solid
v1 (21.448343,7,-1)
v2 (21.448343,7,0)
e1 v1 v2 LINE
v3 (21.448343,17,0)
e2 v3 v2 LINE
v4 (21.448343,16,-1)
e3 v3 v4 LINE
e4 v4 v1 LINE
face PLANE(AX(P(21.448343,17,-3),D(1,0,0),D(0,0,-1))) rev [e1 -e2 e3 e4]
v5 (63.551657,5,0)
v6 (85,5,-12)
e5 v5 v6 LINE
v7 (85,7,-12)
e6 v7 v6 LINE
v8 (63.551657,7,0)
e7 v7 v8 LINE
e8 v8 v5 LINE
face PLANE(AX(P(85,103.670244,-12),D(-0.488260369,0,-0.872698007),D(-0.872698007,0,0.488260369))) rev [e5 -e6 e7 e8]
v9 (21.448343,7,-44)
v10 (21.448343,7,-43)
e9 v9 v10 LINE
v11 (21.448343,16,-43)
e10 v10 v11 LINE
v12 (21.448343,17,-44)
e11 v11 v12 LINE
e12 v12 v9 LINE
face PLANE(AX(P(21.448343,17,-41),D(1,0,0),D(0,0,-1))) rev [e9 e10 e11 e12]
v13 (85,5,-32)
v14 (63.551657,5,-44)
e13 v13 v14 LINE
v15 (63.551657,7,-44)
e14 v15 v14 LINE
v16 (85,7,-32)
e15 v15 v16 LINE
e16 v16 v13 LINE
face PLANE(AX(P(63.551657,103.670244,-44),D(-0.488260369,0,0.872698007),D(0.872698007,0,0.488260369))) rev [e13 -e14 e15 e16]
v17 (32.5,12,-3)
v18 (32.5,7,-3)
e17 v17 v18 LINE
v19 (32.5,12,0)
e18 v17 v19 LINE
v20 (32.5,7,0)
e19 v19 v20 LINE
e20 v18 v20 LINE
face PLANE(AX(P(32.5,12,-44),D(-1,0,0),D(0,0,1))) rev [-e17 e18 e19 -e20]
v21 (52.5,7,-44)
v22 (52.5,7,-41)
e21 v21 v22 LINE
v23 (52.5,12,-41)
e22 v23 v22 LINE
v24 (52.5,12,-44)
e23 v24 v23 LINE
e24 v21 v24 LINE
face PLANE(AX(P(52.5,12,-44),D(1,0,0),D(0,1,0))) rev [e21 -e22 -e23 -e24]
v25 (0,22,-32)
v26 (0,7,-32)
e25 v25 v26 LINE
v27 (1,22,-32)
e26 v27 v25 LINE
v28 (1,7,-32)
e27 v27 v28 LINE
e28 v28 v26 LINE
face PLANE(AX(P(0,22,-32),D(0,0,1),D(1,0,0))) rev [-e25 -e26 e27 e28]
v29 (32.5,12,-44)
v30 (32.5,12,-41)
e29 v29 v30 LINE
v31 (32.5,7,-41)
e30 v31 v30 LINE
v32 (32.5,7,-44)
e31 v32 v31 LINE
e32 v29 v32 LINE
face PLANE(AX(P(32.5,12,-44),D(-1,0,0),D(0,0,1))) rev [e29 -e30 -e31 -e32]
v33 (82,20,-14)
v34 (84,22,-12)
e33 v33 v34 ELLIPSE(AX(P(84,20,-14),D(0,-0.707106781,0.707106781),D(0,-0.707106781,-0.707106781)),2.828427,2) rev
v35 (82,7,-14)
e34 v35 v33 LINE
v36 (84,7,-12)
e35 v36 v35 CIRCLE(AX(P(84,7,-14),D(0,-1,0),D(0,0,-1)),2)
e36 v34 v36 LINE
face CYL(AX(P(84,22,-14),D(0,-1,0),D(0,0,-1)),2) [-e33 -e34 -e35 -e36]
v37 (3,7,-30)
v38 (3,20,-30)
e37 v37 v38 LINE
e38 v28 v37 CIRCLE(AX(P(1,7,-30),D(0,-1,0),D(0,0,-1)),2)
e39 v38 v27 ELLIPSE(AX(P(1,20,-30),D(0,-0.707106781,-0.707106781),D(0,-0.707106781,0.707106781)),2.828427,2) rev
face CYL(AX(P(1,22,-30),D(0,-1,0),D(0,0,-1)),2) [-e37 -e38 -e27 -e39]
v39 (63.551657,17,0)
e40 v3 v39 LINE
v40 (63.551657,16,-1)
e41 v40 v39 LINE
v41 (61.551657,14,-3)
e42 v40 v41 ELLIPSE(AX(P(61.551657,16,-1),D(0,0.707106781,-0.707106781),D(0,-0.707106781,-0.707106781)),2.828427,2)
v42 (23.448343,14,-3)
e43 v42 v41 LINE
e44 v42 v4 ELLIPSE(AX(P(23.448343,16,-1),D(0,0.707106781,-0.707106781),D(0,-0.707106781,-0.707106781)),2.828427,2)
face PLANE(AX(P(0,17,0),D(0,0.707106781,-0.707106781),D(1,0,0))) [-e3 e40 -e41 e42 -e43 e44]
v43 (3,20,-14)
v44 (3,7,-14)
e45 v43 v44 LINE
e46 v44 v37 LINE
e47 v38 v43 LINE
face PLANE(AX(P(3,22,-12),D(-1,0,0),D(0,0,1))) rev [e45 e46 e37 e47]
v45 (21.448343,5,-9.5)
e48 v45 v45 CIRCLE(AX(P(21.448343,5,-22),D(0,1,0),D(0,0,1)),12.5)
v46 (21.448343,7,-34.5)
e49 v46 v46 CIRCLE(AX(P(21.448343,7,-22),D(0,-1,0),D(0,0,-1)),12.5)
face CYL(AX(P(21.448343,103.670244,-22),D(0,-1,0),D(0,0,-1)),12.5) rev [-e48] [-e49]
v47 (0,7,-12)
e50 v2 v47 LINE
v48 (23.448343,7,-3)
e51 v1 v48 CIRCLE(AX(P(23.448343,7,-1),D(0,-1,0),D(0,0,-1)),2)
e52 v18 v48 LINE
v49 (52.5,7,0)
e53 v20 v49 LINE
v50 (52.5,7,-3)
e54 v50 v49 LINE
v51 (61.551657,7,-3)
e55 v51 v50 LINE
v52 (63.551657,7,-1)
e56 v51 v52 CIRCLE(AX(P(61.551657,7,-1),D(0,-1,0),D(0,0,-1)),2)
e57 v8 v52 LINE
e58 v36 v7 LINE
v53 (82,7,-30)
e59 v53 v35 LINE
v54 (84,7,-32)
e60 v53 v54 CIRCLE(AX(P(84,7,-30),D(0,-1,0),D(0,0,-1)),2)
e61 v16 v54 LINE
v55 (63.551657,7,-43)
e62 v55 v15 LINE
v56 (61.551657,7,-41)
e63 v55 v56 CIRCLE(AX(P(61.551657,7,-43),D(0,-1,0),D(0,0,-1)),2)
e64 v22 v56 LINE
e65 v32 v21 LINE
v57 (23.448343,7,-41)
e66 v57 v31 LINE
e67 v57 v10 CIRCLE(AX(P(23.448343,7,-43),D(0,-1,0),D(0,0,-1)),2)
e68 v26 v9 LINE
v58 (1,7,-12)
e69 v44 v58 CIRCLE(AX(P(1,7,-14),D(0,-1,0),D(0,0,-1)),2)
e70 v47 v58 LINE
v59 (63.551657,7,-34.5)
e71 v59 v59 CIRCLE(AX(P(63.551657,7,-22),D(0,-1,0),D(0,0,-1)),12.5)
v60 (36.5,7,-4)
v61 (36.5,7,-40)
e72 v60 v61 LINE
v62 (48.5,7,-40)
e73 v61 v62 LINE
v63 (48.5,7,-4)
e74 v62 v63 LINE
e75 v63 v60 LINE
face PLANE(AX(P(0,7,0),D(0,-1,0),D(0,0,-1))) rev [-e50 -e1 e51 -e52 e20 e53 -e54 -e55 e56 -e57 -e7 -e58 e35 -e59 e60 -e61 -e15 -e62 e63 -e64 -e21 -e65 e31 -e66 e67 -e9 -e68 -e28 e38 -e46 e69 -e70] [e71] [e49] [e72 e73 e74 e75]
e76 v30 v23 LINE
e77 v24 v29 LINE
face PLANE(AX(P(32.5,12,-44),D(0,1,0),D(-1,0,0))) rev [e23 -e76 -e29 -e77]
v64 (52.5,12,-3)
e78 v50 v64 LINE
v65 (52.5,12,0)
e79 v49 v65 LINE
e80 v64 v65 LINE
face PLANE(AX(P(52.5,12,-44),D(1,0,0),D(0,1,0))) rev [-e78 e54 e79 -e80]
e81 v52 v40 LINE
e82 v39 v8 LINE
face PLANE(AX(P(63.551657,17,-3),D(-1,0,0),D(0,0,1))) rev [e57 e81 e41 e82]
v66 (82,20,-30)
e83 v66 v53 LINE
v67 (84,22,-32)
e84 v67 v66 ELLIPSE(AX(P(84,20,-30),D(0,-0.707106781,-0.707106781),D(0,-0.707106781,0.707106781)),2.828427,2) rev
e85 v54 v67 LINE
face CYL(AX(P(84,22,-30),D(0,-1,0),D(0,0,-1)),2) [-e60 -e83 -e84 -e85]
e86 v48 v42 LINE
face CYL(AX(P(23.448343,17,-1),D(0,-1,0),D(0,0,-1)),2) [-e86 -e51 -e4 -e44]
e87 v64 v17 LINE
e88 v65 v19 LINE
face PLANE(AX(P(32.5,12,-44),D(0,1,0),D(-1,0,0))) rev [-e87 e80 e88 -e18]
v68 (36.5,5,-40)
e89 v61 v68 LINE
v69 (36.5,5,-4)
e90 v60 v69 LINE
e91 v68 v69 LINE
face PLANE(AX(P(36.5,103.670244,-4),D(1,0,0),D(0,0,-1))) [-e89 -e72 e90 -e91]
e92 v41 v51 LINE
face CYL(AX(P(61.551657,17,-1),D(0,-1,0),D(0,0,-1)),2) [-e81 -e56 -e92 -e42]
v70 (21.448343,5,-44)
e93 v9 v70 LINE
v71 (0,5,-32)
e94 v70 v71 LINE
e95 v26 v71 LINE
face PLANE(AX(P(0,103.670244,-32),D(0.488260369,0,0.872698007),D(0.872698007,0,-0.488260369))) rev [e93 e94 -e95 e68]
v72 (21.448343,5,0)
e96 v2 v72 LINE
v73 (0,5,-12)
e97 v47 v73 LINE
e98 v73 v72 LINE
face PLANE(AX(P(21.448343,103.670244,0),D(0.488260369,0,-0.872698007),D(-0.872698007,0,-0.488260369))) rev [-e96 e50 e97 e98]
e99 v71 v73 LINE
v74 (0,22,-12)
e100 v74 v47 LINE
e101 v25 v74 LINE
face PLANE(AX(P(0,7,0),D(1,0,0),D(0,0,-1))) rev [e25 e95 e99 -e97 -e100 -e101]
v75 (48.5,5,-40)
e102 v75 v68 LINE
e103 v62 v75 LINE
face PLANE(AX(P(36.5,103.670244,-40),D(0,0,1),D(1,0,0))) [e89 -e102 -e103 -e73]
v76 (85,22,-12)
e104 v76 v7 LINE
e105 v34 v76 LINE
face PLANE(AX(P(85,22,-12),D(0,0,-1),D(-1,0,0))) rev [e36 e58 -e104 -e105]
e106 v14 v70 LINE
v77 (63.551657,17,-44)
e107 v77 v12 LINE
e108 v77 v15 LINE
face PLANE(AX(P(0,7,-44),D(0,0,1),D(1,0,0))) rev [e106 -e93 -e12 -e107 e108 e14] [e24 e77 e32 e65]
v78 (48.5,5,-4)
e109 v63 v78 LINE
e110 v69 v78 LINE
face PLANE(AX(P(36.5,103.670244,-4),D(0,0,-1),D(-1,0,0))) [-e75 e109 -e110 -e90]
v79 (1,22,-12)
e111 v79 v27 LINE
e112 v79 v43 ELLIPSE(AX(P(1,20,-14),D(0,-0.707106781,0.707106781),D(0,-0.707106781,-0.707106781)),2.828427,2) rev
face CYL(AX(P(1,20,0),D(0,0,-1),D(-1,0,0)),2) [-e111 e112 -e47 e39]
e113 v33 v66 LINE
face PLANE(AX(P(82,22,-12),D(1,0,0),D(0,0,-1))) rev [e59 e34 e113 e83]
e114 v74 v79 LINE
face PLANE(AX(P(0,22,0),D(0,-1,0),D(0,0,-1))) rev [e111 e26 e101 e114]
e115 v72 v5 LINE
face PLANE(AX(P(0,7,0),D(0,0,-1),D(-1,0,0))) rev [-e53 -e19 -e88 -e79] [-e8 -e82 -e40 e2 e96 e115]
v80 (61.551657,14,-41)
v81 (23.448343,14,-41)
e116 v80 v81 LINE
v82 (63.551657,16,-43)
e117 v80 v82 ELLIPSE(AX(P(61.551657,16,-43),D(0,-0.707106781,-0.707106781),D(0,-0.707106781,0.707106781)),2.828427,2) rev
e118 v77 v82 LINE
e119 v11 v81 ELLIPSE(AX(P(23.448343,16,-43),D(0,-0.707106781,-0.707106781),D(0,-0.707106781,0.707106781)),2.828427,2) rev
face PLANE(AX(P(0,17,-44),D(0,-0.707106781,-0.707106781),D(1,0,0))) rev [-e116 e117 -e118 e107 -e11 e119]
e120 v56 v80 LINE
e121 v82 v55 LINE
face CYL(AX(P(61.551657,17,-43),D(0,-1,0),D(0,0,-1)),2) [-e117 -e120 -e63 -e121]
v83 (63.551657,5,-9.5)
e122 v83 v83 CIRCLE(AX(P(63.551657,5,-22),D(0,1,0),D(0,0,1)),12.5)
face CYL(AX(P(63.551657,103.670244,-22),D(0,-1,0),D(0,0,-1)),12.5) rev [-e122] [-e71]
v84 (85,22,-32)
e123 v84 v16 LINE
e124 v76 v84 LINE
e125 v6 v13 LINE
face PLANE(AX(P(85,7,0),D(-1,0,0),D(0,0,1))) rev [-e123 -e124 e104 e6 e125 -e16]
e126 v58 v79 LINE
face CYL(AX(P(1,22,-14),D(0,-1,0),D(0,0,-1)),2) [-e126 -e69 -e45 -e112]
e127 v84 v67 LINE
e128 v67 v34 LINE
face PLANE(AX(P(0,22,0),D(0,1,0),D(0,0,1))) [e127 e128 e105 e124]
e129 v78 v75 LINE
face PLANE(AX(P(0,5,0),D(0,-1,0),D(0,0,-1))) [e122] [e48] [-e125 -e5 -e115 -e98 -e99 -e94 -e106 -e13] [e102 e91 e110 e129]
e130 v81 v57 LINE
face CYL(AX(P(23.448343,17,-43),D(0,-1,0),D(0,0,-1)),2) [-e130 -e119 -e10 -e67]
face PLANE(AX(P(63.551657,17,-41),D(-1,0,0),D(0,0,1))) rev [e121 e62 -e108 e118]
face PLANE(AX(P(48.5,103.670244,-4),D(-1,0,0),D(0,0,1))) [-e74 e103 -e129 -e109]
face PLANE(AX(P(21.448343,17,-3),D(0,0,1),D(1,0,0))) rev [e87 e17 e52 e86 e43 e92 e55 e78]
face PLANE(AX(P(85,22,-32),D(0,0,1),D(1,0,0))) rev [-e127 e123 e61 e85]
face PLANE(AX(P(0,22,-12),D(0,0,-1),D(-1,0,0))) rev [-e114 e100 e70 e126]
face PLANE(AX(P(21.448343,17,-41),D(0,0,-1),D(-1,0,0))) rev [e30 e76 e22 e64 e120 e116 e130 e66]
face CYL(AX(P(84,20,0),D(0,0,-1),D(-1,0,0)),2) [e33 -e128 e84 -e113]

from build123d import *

# Parameters (mm, degrees)
SKETCH1_W           = 85
SKETCH1_H           = 44
BOSS_EXTRUDE1_DEPTH = 2
SKETCH2_W           = 3
SKETCH2_H           = 20
BOSS_EXTRUDE2_DEPTH = 15
SKETCH3_W           = 42.103313086
SKETCH3_H           = 3
BOSS_EXTRUDE3_DEPTH = 10
SKETCH4_W           = 20
SKETCH4_H           = 5
CUT_EXTRUDE1_DEPTH  = 99.208960895
CHAMFER1_SIZE       = 3
FILLET1_R           = 2
SKETCH6_OUTSIDE_W   = 106.442
SKETCH6_OUTSIDE_H   = 65.442
SKETCH6_OUTSIDE_R   = 12.5
SKETCH6_OUTSIDE_W_2 = 12
SKETCH6_OUTSIDE_H_2 = 36
CUT_EXTRUDE3_DEPTH  = 2


with BuildPart() as part:
    # Sketch1 → Boss-Extrude1 (new body)
    with BuildSketch(Plane(origin=(0, 5, 0), x_dir=(1, 0, 0), z_dir=(0, 1, 0))):
        with Locations((42.5, 22)):
            Rectangle(SKETCH1_W, SKETCH1_H)
    extrude(amount=BOSS_EXTRUDE1_DEPTH)

    # Sketch2 → Boss-Extrude2 (add)
    with BuildSketch(Plane(origin=(0, 7, 0), x_dir=(1, 0, 0), z_dir=(0, 1, 0))):
        with Locations((1.5, 22)):
            Rectangle(SKETCH2_W, SKETCH2_H)
        with Locations((83.5, 22)):
            Rectangle(SKETCH2_W, SKETCH2_H)
    extrude(amount=BOSS_EXTRUDE2_DEPTH)

    # Sketch3 → Boss-Extrude3 (add)
    with BuildSketch(Plane(origin=(0, 7, 0), x_dir=(1, 0, 0), z_dir=(0, 1, 0))):
        with Locations((42.5, 42.5)):
            Rectangle(SKETCH3_W, SKETCH3_H)
        with Locations((42.5, 1.5)):
            Rectangle(SKETCH3_W, SKETCH3_H)
    extrude(amount=BOSS_EXTRUDE3_DEPTH)

    # Sketch4 → Cut-Extrude1 (cut, through all)
    with BuildSketch(Plane.XY):
        with Locations((42.5, 9.5)):
            Rectangle(SKETCH4_W, SKETCH4_H)
    extrude(amount=-CUT_EXTRUDE1_DEPTH, mode=Mode.SUBTRACT)

    # Chamfer1
    chamfer1_edges = [part.edges().sort_by_distance(p)[0] for p in [
        (42.5, 17, -3),
        (42.5, 17, -41),
    ]]
    chamfer(chamfer1_edges, length=CHAMFER1_SIZE - 0.0001)  # a hair under: the kernel refuses the full size

    # Fillet1
    fillet1_edges = [part.edges().sort_by_distance(p)[0] for p in [
        (3, 14.5, -12),
        (3, 14.5, -32),
        (3, 22, -22),
        (82, 14.5, -32),
        (82, 14.5, -12),
        (82, 22, -22),
        (0, 6, -44),
        (85, 6, -44),
        (85, 6, 0),
        (0, 6, 0),
        (21.448343457, 10.50005, -3),
        (63.551656543, 10.50005, -3),
        (63.551656543, 10.50005, -41),
        (21.448343457, 10.50005, -41),
    ]]
    fillet(fillet1_edges, radius=FILLET1_R)

    # Sketch6 outside → Cut-Extrude3 (cut)
    # profile 1 of 4: a face of its own
    with BuildSketch(Plane(origin=(0, 5, 0), x_dir=(1, 0, 0), z_dir=(0, 1, 0))):
        with Locations((42.5, 22)):
            Rectangle(SKETCH6_OUTSIDE_W, SKETCH6_OUTSIDE_H)
        Polygon((0, 32), (21.448343457, 44), (63.551656543, 44), (85, 32), (85, 12), (63.551656543, 0), (21.448343457, 0), (0, 12), align=None, mode=Mode.SUBTRACT)
    # profile 2 of 4: a face of its own
    with BuildSketch(Plane(origin=(0, 5, 0), x_dir=(1, 0, 0), z_dir=(0, 1, 0))):
        with Locations(Location((21.448343457, 22, 0), (0, 0, 90))):
            Circle(SKETCH6_OUTSIDE_R)
    # profile 3 of 4: a face of its own
    with BuildSketch(Plane(origin=(0, 5, 0), x_dir=(1, 0, 0), z_dir=(0, 1, 0))):
        with Locations(Location((63.551656543, 22, 0), (0, 0, 90))):
            Circle(SKETCH6_OUTSIDE_R)
    # profile 4 of 4: a face of its own
    with BuildSketch(Plane(origin=(0, 5, 0), x_dir=(1, 0, 0), z_dir=(0, 1, 0))):
        with Locations((42.5, 22)):
            Rectangle(SKETCH6_OUTSIDE_W_2, SKETCH6_OUTSIDE_H_2)
    extrude(amount=CUT_EXTRUDE3_DEPTH, mode=Mode.SUBTRACT)


solid = part.part
